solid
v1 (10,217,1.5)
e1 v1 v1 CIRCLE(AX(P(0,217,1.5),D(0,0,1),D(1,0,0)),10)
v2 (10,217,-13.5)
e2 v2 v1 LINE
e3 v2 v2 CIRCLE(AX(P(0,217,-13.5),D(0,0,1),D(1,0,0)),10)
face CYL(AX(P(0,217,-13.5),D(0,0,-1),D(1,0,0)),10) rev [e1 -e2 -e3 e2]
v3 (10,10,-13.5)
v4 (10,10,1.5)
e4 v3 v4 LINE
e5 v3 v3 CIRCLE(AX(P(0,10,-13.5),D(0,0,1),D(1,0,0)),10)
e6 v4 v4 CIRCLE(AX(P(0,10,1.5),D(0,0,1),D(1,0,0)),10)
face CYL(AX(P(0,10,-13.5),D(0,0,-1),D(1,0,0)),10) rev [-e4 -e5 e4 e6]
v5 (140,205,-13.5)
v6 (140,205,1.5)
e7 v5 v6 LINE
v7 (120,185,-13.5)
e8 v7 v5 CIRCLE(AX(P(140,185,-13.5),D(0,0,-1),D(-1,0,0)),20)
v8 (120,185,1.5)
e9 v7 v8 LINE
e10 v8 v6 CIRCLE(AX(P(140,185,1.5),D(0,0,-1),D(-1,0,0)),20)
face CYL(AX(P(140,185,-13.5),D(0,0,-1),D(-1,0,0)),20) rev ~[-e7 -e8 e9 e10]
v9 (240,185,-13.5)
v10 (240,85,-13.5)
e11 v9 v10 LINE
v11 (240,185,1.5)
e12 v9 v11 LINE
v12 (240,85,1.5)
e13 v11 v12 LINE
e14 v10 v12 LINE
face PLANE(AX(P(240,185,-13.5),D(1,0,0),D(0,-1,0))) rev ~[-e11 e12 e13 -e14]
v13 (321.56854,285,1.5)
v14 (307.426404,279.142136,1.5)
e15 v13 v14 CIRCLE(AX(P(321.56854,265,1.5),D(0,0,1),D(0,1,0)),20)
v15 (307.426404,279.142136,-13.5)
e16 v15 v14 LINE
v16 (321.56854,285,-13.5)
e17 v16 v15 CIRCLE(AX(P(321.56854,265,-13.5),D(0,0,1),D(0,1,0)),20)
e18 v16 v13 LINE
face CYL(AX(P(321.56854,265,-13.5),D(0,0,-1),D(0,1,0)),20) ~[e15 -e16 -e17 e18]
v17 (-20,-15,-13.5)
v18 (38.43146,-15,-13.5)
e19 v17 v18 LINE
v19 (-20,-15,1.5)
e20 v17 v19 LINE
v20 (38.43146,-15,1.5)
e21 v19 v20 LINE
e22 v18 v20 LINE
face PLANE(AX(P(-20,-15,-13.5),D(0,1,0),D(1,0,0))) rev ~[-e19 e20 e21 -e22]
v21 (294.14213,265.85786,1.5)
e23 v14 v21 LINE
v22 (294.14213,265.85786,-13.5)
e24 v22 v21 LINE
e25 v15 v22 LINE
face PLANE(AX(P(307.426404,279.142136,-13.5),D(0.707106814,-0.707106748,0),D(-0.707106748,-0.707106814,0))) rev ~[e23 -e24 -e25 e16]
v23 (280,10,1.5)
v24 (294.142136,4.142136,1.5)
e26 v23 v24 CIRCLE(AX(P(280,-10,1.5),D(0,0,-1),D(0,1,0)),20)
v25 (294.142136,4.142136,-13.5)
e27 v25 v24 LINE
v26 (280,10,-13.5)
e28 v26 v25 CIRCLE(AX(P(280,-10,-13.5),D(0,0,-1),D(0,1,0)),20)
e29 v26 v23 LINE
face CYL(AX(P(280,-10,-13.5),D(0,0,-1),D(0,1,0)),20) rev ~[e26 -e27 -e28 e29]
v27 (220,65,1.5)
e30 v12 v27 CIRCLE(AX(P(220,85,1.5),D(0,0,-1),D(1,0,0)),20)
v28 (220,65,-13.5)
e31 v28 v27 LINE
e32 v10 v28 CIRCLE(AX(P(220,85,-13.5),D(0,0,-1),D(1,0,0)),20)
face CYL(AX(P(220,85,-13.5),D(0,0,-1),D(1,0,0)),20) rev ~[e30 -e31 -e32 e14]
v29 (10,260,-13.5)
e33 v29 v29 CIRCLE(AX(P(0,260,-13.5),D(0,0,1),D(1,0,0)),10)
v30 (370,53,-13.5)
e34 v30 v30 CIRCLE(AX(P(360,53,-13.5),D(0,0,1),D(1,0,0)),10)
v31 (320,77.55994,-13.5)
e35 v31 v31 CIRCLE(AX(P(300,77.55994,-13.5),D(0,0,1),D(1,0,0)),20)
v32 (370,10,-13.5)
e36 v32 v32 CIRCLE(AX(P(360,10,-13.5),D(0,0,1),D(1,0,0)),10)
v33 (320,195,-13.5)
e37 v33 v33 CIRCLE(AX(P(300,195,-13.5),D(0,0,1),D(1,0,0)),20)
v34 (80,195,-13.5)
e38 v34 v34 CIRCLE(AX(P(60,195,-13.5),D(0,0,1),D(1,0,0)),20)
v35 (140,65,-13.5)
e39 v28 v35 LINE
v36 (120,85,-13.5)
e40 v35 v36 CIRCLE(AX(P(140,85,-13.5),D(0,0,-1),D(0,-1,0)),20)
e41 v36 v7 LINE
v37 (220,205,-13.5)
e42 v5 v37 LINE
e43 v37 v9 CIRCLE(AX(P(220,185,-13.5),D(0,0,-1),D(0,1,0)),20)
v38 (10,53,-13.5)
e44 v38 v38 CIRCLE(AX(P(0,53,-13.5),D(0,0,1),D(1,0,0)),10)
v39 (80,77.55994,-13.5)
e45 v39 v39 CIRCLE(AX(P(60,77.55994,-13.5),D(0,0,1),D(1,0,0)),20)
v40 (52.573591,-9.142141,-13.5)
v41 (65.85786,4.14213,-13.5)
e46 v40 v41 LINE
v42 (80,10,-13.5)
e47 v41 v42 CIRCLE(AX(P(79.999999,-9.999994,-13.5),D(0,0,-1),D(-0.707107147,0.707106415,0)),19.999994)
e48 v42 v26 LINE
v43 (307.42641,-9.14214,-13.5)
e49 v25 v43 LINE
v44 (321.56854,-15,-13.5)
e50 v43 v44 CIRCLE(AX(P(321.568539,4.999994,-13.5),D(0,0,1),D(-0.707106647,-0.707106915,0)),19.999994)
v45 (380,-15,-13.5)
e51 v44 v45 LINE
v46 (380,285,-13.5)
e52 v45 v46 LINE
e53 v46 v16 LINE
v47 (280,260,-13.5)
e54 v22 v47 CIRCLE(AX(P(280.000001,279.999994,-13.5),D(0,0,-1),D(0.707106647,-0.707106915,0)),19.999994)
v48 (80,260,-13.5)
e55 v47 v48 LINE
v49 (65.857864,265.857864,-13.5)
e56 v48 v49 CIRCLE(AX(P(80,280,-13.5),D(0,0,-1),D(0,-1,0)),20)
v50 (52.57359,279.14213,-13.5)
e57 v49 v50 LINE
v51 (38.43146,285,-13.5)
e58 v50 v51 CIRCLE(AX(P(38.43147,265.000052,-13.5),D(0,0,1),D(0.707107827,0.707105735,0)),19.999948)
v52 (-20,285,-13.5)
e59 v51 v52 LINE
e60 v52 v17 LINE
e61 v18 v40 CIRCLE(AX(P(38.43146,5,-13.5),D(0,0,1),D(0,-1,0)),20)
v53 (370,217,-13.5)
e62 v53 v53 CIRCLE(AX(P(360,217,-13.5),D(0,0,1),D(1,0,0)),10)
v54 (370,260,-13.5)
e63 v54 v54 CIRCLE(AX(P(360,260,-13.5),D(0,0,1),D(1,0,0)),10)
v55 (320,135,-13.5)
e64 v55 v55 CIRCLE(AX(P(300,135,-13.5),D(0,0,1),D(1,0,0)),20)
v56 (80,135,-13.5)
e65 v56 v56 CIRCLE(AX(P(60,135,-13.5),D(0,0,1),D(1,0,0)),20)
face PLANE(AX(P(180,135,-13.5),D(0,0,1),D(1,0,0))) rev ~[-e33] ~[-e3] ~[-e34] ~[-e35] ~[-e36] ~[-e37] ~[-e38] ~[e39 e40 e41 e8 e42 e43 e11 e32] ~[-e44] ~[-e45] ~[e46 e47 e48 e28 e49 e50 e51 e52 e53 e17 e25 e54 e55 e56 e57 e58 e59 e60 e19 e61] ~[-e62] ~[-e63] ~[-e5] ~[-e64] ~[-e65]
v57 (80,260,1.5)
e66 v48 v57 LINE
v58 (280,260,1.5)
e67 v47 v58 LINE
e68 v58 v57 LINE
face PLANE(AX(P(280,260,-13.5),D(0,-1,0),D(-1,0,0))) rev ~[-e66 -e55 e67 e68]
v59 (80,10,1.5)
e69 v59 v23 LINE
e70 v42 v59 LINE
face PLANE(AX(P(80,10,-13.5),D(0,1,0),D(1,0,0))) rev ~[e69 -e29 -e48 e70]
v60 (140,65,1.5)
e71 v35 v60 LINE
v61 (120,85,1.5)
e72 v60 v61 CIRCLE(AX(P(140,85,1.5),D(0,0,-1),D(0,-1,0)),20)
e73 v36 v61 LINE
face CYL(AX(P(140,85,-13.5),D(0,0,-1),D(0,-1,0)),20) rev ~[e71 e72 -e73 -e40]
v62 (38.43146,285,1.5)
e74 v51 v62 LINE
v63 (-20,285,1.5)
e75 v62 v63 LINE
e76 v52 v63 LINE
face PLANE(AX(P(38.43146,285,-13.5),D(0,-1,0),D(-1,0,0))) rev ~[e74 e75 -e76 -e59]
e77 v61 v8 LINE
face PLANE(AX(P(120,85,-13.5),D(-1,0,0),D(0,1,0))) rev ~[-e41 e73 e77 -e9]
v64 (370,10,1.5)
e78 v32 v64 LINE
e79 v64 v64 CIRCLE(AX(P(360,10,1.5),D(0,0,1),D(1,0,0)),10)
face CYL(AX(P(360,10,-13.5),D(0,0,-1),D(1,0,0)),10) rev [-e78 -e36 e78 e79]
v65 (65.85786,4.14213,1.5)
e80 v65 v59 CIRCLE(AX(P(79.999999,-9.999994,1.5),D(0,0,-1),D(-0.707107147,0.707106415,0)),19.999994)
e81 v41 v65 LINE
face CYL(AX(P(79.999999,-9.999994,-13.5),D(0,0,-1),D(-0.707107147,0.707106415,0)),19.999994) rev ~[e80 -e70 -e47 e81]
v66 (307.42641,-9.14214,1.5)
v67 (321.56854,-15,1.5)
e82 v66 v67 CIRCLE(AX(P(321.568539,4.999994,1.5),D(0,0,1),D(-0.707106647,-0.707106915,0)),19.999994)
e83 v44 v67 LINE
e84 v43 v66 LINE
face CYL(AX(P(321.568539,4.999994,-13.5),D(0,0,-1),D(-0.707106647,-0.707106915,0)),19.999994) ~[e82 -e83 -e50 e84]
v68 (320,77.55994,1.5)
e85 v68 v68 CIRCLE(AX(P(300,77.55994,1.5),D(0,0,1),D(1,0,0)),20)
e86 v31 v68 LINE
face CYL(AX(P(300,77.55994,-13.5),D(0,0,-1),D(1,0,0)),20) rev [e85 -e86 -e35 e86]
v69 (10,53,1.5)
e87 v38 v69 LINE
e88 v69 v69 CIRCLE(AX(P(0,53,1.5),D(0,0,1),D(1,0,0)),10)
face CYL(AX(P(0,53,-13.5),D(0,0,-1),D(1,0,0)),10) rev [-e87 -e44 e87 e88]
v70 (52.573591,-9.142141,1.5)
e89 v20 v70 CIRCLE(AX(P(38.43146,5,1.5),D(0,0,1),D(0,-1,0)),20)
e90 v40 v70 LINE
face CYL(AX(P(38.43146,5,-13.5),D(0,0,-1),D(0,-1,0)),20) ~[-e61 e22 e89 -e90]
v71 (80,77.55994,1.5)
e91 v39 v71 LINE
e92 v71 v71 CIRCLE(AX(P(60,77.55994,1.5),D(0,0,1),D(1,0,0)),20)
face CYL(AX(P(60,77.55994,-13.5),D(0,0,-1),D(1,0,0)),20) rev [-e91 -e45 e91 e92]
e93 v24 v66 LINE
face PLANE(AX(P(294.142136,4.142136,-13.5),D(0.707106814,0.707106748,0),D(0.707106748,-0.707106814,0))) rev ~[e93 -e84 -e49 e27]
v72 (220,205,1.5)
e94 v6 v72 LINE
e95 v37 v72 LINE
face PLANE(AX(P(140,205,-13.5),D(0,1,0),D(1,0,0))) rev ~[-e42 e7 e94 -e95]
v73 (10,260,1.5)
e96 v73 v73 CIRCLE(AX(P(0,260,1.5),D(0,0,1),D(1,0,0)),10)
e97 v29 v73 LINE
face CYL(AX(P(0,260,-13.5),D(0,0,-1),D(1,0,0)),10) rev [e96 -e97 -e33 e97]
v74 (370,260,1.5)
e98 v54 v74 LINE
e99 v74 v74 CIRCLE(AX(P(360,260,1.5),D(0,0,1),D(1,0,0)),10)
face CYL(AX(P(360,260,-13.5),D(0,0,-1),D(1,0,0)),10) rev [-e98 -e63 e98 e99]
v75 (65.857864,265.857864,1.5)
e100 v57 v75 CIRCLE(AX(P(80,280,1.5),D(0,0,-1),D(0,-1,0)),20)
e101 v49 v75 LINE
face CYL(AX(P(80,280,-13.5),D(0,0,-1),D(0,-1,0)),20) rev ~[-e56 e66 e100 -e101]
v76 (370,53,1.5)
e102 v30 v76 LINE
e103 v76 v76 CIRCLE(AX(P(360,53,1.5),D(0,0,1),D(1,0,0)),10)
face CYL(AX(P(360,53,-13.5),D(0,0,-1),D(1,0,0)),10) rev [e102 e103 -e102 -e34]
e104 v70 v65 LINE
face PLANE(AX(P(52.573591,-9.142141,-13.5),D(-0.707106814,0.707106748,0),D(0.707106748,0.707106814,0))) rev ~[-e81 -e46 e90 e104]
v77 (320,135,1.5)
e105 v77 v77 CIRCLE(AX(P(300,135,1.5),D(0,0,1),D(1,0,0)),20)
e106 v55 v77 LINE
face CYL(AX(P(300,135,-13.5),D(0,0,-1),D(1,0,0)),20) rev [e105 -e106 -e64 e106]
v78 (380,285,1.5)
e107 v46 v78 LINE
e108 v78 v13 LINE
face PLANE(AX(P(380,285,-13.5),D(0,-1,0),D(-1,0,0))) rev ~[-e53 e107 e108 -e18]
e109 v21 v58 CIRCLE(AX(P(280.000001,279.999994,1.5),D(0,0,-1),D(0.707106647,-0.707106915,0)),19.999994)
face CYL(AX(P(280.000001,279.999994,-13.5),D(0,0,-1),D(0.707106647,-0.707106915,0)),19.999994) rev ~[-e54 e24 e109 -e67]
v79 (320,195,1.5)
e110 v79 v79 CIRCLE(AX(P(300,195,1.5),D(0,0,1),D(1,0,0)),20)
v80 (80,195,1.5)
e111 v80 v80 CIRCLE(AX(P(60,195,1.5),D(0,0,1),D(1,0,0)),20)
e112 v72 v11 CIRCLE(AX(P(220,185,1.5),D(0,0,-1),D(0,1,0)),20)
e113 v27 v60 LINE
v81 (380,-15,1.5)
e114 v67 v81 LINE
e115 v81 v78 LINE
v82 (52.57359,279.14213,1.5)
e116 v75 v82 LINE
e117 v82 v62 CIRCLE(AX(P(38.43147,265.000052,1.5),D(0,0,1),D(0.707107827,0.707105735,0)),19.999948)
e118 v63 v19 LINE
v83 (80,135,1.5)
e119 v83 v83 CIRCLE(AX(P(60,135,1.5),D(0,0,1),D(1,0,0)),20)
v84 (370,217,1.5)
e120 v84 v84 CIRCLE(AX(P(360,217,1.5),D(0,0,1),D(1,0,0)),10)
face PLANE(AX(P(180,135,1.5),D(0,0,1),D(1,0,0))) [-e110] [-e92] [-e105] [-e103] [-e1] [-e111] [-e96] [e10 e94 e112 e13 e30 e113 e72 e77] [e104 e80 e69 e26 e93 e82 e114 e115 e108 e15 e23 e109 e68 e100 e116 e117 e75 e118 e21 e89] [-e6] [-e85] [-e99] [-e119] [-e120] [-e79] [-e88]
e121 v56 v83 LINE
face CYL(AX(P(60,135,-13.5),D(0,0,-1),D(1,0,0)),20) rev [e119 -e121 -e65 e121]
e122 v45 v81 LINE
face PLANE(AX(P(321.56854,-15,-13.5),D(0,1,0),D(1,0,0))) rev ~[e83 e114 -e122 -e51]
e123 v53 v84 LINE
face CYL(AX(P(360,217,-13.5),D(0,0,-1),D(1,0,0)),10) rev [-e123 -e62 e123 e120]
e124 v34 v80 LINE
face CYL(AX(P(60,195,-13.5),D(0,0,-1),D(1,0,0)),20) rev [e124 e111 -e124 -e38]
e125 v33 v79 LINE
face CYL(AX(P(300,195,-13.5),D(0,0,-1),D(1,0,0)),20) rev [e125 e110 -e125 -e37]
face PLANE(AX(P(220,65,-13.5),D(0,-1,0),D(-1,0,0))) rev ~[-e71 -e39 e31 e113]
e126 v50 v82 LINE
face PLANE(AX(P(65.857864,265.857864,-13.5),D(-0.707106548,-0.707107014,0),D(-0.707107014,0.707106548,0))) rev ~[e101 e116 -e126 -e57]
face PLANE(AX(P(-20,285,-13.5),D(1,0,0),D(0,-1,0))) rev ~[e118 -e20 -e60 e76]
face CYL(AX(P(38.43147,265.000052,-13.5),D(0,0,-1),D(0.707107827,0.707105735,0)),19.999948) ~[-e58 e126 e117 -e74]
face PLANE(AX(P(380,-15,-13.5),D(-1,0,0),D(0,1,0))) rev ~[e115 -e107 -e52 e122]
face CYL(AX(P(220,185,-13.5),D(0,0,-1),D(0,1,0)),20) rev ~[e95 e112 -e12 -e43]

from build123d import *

# Parameters (mm, degrees)
F0_R     = 1
F0_R_2   = 2
F1_DEPTH = 1.5
F2_SCALE = 10


# Not quite as in the source:
# - ends of sketch curves that miss each other by under 0.0002 mm in the source are joined


with BuildPart() as f1:
    # F0 (on Top) → F1 (new body)
    with BuildSketch(Plane.XY):
        with BuildLine():
            ThreePointArc((14.156854, 15), (13.3914871353, 14.847759065), (12.7426404376, 14.4142135624))
            Line((12.7426404376, 14.4142135624), (11.414213, 13.085786))
            ThreePointArc((11.414213, 13.085786), (10.7653665381, 12.6522407997), (10, 12.5))
            Line((10, 12.5), (-10, 12.5))
            ThreePointArc((-10, 12.5), (-10.7653668647, 12.652240935), (-11.4142135624, 13.0857864376))
            Line((-11.4142135624, 13.0857864376), (-12.742641, 14.414213))
            ThreePointArc((-12.742641, 14.414213), (-13.3914871353, 14.847759065), (-14.156854, 15))
            Line((-14.156854, 15), (-20, 15))
            Line((-20, 15), (-20, -15))
            Line((-20, -15), (-14.156854, -15))
            ThreePointArc((-14.156854, -15), (-13.3914874619, -14.8477592003), (-12.7426409376, -14.4142140624))
            Line((-12.7426409376, -14.4142140624), (-11.414214, -13.085787))
            ThreePointArc((-11.414214, -13.085787), (-10.7653671914, -12.6522410703), (-10, -12.5))
            Line((-10, -12.5), (10, -12.5))
            ThreePointArc((10, -12.5), (10.7653668647, -12.652240935), (11.4142135624, -13.0857864376))
            Line((11.4142135624, -13.0857864376), (12.742641, -14.414214))
            ThreePointArc((12.742641, -14.414214), (13.3914874619, -14.8477592003), (14.156854, -15))
            Line((14.156854, -15), (20, -15))
            Line((20, -15), (20, 15))
            Line((20, 15), (14.156854, 15))
        make_face()
        with Locations((-18, -12.5)):
            Circle(F0_R, mode=Mode.SUBTRACT)
        with Locations((-18, -8.2)):
            Circle(F0_R, mode=Mode.SUBTRACT)
        with Locations((-12, -5.744006)):
            Circle(F0_R_2, mode=Mode.SUBTRACT)
        with Locations((18, -12.5)):
            Circle(F0_R, mode=Mode.SUBTRACT)
        with Locations((18, -8.2)):
            Circle(F0_R, mode=Mode.SUBTRACT)
        with Locations((12, -5.744006)):
            Circle(F0_R_2, mode=Mode.SUBTRACT)
        with Locations((-12, 0)):
            Circle(F0_R_2, mode=Mode.SUBTRACT)
        with Locations((-12, 6)):
            Circle(F0_R_2, mode=Mode.SUBTRACT)
        with Locations((-18, 8.2)):
            Circle(F0_R, mode=Mode.SUBTRACT)
        with Locations((-18, 12.5)):
            Circle(F0_R, mode=Mode.SUBTRACT)
        with BuildLine():
            ThreePointArc((-6, 5), (-5.4142135624, 6.4142135624), (-4, 7))
            Line((-4, 7), (4, 7))
            ThreePointArc((4, 7), (5.4142135624, 6.4142135624), (6, 5))
            Line((6, 5), (6, -5))
            ThreePointArc((6, -5), (5.4142135624, -6.4142135624), (4, -7))
            Line((4, -7), (-4, -7))
            ThreePointArc((-4, -7), (-5.4142135624, -6.4142135624), (-6, -5))
            Line((-6, -5), (-6, 5))
        make_face(mode=Mode.SUBTRACT)
        with Locations((12, 0)):
            Circle(F0_R_2, mode=Mode.SUBTRACT)
        with Locations((12, 6)):
            Circle(F0_R_2, mode=Mode.SUBTRACT)
        with Locations((18, 8.2)):
            Circle(F0_R, mode=Mode.SUBTRACT)
        with Locations((18, 12.5)):
            Circle(F0_R, mode=Mode.SUBTRACT)
    extrude(amount=F1_DEPTH)


with BuildPart() as f1_1:
    # F2: moved
    add(f1.part.scale(F2_SCALE).moved(Location((180, 135, -13.5))))


solid = f1_1.part
